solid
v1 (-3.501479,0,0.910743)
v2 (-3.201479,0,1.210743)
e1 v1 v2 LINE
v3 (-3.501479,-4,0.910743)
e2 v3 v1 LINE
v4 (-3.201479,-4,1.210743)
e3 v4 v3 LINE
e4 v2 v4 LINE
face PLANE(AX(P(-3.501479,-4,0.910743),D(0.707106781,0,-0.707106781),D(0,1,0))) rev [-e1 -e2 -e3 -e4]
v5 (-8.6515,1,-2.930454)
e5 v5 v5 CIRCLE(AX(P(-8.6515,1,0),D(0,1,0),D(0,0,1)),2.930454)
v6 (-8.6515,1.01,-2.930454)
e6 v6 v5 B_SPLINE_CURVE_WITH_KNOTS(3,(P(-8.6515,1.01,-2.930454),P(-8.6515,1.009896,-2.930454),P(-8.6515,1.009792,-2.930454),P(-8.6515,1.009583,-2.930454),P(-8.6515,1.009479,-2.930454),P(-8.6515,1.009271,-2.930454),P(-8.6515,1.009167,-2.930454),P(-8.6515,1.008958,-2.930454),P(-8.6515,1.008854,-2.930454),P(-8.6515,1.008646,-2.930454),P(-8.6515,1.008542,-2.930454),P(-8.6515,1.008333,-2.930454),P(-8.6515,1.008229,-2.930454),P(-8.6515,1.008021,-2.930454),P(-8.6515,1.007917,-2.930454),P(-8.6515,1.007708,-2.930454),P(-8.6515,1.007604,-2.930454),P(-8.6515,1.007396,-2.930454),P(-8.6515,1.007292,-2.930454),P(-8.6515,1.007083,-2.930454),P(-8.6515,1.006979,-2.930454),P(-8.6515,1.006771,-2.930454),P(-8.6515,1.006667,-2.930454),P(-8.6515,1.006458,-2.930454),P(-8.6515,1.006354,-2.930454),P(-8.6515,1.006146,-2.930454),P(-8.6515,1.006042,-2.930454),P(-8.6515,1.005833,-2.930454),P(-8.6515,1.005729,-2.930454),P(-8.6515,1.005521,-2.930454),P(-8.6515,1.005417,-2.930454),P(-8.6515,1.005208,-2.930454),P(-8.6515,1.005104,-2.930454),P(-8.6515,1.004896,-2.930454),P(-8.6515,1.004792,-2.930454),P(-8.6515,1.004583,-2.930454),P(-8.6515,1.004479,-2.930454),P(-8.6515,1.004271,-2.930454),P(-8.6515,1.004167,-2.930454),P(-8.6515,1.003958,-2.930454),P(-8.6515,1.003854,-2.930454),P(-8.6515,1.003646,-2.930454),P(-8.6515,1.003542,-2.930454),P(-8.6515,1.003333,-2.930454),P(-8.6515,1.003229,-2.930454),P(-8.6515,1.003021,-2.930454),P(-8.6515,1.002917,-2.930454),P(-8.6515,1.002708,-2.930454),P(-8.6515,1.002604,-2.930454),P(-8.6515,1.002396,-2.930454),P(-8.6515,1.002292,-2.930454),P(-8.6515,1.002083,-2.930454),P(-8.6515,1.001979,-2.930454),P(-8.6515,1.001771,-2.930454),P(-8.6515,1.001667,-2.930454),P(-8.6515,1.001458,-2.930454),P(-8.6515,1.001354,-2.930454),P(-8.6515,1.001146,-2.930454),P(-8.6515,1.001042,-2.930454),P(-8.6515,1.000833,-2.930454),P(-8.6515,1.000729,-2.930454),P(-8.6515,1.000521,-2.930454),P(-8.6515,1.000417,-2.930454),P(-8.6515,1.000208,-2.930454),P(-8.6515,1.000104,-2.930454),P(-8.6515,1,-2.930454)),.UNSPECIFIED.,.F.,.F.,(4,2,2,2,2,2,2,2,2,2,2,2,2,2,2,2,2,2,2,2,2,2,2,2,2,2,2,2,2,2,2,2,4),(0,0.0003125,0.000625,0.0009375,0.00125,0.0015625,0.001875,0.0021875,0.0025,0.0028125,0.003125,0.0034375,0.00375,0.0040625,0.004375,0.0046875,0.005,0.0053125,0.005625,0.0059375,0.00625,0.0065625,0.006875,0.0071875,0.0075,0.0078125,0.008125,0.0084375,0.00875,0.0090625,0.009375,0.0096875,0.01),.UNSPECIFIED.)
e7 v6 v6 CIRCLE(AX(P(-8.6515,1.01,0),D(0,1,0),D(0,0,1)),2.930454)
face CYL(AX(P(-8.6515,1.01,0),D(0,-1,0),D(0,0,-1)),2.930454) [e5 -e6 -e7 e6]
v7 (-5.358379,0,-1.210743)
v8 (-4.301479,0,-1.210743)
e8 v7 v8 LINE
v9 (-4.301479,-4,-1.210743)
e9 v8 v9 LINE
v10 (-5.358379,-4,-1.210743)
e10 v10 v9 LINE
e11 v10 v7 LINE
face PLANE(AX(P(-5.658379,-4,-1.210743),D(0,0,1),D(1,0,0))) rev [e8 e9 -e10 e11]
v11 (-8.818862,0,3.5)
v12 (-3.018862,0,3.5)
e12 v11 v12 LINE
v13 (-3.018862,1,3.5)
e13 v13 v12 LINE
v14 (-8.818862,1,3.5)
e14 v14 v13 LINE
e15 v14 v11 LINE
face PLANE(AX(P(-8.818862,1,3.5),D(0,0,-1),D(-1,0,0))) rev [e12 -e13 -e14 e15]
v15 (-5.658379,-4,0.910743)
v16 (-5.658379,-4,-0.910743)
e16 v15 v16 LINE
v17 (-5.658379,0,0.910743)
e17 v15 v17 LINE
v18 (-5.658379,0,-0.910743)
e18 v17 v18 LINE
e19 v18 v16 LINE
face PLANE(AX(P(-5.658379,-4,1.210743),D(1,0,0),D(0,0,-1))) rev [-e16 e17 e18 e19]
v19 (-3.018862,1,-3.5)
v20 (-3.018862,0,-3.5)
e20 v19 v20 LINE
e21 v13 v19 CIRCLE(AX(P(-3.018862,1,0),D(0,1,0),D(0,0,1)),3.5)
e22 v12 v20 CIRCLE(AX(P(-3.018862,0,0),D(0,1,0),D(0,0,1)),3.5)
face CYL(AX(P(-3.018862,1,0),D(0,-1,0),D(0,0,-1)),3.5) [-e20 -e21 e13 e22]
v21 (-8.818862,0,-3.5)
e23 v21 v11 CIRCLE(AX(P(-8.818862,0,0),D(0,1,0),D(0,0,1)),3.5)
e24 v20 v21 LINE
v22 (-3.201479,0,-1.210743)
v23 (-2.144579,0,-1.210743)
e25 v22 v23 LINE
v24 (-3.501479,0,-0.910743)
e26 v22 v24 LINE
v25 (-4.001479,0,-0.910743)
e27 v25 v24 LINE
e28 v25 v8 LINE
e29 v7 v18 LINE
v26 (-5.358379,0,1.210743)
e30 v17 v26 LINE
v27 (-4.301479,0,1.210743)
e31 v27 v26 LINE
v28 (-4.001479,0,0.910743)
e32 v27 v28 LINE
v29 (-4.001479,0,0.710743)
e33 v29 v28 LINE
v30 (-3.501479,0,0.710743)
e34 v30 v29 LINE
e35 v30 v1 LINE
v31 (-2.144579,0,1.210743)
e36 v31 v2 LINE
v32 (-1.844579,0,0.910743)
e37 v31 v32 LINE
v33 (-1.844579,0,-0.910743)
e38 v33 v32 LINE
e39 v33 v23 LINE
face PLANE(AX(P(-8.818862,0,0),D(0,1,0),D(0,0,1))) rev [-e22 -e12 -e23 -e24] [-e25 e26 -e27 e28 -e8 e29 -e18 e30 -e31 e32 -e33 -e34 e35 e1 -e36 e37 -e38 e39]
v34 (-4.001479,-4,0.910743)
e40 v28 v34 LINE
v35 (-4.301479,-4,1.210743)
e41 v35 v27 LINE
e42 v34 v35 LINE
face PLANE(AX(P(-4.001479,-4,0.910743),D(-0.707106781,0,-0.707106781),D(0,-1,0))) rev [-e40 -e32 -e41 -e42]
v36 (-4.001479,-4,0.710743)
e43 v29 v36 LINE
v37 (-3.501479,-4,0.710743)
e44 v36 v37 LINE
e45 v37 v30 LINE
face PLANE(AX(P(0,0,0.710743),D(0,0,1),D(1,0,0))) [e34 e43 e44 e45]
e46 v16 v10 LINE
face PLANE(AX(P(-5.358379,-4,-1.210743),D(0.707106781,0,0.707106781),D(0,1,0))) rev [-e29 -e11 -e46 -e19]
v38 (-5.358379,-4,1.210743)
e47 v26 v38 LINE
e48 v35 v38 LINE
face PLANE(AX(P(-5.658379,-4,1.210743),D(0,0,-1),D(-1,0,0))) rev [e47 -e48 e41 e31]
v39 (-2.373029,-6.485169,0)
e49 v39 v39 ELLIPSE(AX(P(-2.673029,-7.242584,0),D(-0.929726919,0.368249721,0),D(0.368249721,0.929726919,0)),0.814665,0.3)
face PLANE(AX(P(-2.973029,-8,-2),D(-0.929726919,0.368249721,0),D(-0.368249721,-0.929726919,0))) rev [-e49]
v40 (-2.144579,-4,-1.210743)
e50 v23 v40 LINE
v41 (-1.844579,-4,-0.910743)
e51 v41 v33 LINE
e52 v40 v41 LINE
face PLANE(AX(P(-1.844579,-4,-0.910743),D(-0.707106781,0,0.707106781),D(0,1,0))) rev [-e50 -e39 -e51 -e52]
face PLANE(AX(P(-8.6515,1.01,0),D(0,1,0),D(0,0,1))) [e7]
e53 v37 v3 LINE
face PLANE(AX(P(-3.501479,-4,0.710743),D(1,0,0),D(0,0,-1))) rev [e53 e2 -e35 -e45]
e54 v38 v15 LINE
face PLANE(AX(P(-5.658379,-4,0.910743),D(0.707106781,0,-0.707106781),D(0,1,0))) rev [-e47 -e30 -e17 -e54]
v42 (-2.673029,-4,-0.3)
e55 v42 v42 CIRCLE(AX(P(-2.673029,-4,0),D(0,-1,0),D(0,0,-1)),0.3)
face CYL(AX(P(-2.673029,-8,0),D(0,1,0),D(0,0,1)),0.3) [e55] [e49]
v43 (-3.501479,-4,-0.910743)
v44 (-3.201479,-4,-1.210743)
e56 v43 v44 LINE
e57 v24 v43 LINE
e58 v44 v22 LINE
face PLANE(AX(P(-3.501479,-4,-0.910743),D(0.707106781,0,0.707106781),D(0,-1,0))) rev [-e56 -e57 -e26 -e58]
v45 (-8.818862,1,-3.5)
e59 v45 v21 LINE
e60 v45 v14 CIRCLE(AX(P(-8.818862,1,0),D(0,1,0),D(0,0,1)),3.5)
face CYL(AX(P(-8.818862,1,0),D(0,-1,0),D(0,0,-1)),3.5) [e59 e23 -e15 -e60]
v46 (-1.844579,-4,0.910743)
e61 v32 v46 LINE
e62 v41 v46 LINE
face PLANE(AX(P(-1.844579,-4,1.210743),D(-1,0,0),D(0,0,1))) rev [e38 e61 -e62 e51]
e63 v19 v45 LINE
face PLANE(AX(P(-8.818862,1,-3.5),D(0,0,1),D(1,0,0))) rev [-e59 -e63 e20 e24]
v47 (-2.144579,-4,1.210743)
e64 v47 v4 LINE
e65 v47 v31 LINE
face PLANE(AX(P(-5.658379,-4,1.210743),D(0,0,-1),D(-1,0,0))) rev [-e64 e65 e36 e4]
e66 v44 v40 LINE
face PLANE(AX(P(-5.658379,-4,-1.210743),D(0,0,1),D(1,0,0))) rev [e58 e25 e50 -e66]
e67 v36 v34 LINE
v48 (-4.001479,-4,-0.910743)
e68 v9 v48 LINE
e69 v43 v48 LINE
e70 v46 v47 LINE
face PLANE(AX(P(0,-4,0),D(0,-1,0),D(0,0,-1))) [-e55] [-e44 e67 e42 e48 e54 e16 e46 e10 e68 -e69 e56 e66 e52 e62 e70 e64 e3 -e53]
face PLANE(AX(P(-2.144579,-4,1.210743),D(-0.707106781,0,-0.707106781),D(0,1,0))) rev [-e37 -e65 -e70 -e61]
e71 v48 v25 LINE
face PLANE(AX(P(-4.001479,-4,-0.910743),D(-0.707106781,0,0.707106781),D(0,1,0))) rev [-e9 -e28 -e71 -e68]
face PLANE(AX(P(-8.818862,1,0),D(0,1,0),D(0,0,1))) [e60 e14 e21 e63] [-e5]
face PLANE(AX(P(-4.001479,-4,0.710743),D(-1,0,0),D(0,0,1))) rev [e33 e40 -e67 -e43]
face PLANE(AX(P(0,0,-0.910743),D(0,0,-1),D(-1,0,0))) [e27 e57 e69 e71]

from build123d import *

# Parameters (mm, degrees)
EXTRUDE_1_DEPTH     = 1
SKETCH_2_R          = 2.930453947
EXTRUDE_2_DEPTH     = 0.01
SKETCH_3_W          = 3.813800337
SKETCH_3_H          = 2.421486406
EXTRUDE_3_DEPTH     = 4
SKETCH_4_W          = 0.5
SKETCH_4_H          = 4
CUT_EXTRUDE_1_DEPTH = 0.3
SKETCH_5_W          = 0.5
SKETCH_5_H          = 4
CUT_EXTRUDE_2_DEPTH = 0.5
CHAMFER_1_SIZE      = 0.3
SKETCH_6_R          = 0.3
EXTRUDE_4_DEPTH     = 4
CUT_EXTRUDE_3_DEPTH = 2


with BuildPart() as part:
    # 草图1 → 凸台-拉伸1 (new body)
    with BuildSketch(Plane(origin=(0, 0, 0), x_dir=(1, 0, 0), z_dir=(0, 1, 0))):
        with BuildLine():
            Line((-8.818862275, 3.5), (-3.018862275, 3.5))
            ThreePointArc((-3.018862275, 3.5), (0.481137725, 0), (-3.018862275, -3.5))
            Line((-3.018862275, -3.5), (-8.818862275, -3.5))
            ThreePointArc((-8.818862275, -3.5), (-12.318862275, 0), (-8.818862275, 3.5))
        make_face()
    extrude(amount=EXTRUDE_1_DEPTH)

    # 草图2 → 凸台-拉伸2 (add)
    with BuildSketch(Plane(origin=(0, 1, 0), x_dir=(1, 0, 0), z_dir=(0, 1, 0))):
        with Locations(Location((-8.651499717, 0, 0), (0, 0, 90))):
            Circle(SKETCH_2_R)
    extrude(amount=EXTRUDE_2_DEPTH)

    # 草图3 → 凸台-拉伸3 (add)
    with BuildSketch(Plane(origin=(0, 0, 0), x_dir=(-1, 0, 0), z_dir=(0, -1, 0))):
        with Locations((3.751479011, 0)):
            Rectangle(SKETCH_3_W, SKETCH_3_H)
    extrude(amount=EXTRUDE_3_DEPTH)

    # 草图4 → 切除-拉伸1 (cut)
    with BuildSketch(Plane(origin=(0, 0, -1.210743203), x_dir=(-1, 0, 0), z_dir=(0, 0, -1))):
        with Locations((3.751479011, -2)):
            Rectangle(SKETCH_4_W, SKETCH_4_H)
    extrude(amount=-CUT_EXTRUDE_1_DEPTH, mode=Mode.SUBTRACT)

    # 草图5 → 切除-拉伸2 (cut)
    with BuildSketch(Plane.XY.offset(1.210743203)):
        with Locations((-3.751479011, -2)):
            Rectangle(SKETCH_5_W, SKETCH_5_H)
    extrude(amount=-CUT_EXTRUDE_2_DEPTH, mode=Mode.SUBTRACT)

    # 倒角1
    chamfer_1_edges = [part.edges().sort_by_distance(p)[0] for p in [
        (-5.658379179, -2, 1.210743203),
        (-5.658379179, -2, -1.210743203),
        (-1.844578842, -2, -1.210743203),
        (-1.844578842, -2, 1.210743203),
        (-4.001479011, -2, -1.210743203),
        (-3.501479011, -2, -1.210743203),
        (-3.501479011, -2, 1.210743203),
        (-4.001479011, -2, 1.210743203),
    ]]
    chamfer(chamfer_1_edges, length=CHAMFER_1_SIZE - 0.0001)  # a hair under: the kernel refuses the full size

    # 草图6 → 凸台-拉伸4 (add)
    with BuildSketch(Plane(origin=(0, -4, 0), x_dir=(-1, 0, 0), z_dir=(0, -1, 0))):
        with Locations(Location((2.673028926, 0, 0), (0, 0, 90))):
            Circle(SKETCH_6_R)
    extrude(amount=EXTRUDE_4_DEPTH)

    # 草图7 → 切除-拉伸3 (cut, symmetric)
    with BuildSketch(Plane.XY):
        Polygon((-2.973028926, -8), (-2.373028926, -6.485168842), (-2.373028926, -8), align=None)
    extrude(amount=CUT_EXTRUDE_3_DEPTH, both=True, mode=Mode.SUBTRACT)


solid = part.part
